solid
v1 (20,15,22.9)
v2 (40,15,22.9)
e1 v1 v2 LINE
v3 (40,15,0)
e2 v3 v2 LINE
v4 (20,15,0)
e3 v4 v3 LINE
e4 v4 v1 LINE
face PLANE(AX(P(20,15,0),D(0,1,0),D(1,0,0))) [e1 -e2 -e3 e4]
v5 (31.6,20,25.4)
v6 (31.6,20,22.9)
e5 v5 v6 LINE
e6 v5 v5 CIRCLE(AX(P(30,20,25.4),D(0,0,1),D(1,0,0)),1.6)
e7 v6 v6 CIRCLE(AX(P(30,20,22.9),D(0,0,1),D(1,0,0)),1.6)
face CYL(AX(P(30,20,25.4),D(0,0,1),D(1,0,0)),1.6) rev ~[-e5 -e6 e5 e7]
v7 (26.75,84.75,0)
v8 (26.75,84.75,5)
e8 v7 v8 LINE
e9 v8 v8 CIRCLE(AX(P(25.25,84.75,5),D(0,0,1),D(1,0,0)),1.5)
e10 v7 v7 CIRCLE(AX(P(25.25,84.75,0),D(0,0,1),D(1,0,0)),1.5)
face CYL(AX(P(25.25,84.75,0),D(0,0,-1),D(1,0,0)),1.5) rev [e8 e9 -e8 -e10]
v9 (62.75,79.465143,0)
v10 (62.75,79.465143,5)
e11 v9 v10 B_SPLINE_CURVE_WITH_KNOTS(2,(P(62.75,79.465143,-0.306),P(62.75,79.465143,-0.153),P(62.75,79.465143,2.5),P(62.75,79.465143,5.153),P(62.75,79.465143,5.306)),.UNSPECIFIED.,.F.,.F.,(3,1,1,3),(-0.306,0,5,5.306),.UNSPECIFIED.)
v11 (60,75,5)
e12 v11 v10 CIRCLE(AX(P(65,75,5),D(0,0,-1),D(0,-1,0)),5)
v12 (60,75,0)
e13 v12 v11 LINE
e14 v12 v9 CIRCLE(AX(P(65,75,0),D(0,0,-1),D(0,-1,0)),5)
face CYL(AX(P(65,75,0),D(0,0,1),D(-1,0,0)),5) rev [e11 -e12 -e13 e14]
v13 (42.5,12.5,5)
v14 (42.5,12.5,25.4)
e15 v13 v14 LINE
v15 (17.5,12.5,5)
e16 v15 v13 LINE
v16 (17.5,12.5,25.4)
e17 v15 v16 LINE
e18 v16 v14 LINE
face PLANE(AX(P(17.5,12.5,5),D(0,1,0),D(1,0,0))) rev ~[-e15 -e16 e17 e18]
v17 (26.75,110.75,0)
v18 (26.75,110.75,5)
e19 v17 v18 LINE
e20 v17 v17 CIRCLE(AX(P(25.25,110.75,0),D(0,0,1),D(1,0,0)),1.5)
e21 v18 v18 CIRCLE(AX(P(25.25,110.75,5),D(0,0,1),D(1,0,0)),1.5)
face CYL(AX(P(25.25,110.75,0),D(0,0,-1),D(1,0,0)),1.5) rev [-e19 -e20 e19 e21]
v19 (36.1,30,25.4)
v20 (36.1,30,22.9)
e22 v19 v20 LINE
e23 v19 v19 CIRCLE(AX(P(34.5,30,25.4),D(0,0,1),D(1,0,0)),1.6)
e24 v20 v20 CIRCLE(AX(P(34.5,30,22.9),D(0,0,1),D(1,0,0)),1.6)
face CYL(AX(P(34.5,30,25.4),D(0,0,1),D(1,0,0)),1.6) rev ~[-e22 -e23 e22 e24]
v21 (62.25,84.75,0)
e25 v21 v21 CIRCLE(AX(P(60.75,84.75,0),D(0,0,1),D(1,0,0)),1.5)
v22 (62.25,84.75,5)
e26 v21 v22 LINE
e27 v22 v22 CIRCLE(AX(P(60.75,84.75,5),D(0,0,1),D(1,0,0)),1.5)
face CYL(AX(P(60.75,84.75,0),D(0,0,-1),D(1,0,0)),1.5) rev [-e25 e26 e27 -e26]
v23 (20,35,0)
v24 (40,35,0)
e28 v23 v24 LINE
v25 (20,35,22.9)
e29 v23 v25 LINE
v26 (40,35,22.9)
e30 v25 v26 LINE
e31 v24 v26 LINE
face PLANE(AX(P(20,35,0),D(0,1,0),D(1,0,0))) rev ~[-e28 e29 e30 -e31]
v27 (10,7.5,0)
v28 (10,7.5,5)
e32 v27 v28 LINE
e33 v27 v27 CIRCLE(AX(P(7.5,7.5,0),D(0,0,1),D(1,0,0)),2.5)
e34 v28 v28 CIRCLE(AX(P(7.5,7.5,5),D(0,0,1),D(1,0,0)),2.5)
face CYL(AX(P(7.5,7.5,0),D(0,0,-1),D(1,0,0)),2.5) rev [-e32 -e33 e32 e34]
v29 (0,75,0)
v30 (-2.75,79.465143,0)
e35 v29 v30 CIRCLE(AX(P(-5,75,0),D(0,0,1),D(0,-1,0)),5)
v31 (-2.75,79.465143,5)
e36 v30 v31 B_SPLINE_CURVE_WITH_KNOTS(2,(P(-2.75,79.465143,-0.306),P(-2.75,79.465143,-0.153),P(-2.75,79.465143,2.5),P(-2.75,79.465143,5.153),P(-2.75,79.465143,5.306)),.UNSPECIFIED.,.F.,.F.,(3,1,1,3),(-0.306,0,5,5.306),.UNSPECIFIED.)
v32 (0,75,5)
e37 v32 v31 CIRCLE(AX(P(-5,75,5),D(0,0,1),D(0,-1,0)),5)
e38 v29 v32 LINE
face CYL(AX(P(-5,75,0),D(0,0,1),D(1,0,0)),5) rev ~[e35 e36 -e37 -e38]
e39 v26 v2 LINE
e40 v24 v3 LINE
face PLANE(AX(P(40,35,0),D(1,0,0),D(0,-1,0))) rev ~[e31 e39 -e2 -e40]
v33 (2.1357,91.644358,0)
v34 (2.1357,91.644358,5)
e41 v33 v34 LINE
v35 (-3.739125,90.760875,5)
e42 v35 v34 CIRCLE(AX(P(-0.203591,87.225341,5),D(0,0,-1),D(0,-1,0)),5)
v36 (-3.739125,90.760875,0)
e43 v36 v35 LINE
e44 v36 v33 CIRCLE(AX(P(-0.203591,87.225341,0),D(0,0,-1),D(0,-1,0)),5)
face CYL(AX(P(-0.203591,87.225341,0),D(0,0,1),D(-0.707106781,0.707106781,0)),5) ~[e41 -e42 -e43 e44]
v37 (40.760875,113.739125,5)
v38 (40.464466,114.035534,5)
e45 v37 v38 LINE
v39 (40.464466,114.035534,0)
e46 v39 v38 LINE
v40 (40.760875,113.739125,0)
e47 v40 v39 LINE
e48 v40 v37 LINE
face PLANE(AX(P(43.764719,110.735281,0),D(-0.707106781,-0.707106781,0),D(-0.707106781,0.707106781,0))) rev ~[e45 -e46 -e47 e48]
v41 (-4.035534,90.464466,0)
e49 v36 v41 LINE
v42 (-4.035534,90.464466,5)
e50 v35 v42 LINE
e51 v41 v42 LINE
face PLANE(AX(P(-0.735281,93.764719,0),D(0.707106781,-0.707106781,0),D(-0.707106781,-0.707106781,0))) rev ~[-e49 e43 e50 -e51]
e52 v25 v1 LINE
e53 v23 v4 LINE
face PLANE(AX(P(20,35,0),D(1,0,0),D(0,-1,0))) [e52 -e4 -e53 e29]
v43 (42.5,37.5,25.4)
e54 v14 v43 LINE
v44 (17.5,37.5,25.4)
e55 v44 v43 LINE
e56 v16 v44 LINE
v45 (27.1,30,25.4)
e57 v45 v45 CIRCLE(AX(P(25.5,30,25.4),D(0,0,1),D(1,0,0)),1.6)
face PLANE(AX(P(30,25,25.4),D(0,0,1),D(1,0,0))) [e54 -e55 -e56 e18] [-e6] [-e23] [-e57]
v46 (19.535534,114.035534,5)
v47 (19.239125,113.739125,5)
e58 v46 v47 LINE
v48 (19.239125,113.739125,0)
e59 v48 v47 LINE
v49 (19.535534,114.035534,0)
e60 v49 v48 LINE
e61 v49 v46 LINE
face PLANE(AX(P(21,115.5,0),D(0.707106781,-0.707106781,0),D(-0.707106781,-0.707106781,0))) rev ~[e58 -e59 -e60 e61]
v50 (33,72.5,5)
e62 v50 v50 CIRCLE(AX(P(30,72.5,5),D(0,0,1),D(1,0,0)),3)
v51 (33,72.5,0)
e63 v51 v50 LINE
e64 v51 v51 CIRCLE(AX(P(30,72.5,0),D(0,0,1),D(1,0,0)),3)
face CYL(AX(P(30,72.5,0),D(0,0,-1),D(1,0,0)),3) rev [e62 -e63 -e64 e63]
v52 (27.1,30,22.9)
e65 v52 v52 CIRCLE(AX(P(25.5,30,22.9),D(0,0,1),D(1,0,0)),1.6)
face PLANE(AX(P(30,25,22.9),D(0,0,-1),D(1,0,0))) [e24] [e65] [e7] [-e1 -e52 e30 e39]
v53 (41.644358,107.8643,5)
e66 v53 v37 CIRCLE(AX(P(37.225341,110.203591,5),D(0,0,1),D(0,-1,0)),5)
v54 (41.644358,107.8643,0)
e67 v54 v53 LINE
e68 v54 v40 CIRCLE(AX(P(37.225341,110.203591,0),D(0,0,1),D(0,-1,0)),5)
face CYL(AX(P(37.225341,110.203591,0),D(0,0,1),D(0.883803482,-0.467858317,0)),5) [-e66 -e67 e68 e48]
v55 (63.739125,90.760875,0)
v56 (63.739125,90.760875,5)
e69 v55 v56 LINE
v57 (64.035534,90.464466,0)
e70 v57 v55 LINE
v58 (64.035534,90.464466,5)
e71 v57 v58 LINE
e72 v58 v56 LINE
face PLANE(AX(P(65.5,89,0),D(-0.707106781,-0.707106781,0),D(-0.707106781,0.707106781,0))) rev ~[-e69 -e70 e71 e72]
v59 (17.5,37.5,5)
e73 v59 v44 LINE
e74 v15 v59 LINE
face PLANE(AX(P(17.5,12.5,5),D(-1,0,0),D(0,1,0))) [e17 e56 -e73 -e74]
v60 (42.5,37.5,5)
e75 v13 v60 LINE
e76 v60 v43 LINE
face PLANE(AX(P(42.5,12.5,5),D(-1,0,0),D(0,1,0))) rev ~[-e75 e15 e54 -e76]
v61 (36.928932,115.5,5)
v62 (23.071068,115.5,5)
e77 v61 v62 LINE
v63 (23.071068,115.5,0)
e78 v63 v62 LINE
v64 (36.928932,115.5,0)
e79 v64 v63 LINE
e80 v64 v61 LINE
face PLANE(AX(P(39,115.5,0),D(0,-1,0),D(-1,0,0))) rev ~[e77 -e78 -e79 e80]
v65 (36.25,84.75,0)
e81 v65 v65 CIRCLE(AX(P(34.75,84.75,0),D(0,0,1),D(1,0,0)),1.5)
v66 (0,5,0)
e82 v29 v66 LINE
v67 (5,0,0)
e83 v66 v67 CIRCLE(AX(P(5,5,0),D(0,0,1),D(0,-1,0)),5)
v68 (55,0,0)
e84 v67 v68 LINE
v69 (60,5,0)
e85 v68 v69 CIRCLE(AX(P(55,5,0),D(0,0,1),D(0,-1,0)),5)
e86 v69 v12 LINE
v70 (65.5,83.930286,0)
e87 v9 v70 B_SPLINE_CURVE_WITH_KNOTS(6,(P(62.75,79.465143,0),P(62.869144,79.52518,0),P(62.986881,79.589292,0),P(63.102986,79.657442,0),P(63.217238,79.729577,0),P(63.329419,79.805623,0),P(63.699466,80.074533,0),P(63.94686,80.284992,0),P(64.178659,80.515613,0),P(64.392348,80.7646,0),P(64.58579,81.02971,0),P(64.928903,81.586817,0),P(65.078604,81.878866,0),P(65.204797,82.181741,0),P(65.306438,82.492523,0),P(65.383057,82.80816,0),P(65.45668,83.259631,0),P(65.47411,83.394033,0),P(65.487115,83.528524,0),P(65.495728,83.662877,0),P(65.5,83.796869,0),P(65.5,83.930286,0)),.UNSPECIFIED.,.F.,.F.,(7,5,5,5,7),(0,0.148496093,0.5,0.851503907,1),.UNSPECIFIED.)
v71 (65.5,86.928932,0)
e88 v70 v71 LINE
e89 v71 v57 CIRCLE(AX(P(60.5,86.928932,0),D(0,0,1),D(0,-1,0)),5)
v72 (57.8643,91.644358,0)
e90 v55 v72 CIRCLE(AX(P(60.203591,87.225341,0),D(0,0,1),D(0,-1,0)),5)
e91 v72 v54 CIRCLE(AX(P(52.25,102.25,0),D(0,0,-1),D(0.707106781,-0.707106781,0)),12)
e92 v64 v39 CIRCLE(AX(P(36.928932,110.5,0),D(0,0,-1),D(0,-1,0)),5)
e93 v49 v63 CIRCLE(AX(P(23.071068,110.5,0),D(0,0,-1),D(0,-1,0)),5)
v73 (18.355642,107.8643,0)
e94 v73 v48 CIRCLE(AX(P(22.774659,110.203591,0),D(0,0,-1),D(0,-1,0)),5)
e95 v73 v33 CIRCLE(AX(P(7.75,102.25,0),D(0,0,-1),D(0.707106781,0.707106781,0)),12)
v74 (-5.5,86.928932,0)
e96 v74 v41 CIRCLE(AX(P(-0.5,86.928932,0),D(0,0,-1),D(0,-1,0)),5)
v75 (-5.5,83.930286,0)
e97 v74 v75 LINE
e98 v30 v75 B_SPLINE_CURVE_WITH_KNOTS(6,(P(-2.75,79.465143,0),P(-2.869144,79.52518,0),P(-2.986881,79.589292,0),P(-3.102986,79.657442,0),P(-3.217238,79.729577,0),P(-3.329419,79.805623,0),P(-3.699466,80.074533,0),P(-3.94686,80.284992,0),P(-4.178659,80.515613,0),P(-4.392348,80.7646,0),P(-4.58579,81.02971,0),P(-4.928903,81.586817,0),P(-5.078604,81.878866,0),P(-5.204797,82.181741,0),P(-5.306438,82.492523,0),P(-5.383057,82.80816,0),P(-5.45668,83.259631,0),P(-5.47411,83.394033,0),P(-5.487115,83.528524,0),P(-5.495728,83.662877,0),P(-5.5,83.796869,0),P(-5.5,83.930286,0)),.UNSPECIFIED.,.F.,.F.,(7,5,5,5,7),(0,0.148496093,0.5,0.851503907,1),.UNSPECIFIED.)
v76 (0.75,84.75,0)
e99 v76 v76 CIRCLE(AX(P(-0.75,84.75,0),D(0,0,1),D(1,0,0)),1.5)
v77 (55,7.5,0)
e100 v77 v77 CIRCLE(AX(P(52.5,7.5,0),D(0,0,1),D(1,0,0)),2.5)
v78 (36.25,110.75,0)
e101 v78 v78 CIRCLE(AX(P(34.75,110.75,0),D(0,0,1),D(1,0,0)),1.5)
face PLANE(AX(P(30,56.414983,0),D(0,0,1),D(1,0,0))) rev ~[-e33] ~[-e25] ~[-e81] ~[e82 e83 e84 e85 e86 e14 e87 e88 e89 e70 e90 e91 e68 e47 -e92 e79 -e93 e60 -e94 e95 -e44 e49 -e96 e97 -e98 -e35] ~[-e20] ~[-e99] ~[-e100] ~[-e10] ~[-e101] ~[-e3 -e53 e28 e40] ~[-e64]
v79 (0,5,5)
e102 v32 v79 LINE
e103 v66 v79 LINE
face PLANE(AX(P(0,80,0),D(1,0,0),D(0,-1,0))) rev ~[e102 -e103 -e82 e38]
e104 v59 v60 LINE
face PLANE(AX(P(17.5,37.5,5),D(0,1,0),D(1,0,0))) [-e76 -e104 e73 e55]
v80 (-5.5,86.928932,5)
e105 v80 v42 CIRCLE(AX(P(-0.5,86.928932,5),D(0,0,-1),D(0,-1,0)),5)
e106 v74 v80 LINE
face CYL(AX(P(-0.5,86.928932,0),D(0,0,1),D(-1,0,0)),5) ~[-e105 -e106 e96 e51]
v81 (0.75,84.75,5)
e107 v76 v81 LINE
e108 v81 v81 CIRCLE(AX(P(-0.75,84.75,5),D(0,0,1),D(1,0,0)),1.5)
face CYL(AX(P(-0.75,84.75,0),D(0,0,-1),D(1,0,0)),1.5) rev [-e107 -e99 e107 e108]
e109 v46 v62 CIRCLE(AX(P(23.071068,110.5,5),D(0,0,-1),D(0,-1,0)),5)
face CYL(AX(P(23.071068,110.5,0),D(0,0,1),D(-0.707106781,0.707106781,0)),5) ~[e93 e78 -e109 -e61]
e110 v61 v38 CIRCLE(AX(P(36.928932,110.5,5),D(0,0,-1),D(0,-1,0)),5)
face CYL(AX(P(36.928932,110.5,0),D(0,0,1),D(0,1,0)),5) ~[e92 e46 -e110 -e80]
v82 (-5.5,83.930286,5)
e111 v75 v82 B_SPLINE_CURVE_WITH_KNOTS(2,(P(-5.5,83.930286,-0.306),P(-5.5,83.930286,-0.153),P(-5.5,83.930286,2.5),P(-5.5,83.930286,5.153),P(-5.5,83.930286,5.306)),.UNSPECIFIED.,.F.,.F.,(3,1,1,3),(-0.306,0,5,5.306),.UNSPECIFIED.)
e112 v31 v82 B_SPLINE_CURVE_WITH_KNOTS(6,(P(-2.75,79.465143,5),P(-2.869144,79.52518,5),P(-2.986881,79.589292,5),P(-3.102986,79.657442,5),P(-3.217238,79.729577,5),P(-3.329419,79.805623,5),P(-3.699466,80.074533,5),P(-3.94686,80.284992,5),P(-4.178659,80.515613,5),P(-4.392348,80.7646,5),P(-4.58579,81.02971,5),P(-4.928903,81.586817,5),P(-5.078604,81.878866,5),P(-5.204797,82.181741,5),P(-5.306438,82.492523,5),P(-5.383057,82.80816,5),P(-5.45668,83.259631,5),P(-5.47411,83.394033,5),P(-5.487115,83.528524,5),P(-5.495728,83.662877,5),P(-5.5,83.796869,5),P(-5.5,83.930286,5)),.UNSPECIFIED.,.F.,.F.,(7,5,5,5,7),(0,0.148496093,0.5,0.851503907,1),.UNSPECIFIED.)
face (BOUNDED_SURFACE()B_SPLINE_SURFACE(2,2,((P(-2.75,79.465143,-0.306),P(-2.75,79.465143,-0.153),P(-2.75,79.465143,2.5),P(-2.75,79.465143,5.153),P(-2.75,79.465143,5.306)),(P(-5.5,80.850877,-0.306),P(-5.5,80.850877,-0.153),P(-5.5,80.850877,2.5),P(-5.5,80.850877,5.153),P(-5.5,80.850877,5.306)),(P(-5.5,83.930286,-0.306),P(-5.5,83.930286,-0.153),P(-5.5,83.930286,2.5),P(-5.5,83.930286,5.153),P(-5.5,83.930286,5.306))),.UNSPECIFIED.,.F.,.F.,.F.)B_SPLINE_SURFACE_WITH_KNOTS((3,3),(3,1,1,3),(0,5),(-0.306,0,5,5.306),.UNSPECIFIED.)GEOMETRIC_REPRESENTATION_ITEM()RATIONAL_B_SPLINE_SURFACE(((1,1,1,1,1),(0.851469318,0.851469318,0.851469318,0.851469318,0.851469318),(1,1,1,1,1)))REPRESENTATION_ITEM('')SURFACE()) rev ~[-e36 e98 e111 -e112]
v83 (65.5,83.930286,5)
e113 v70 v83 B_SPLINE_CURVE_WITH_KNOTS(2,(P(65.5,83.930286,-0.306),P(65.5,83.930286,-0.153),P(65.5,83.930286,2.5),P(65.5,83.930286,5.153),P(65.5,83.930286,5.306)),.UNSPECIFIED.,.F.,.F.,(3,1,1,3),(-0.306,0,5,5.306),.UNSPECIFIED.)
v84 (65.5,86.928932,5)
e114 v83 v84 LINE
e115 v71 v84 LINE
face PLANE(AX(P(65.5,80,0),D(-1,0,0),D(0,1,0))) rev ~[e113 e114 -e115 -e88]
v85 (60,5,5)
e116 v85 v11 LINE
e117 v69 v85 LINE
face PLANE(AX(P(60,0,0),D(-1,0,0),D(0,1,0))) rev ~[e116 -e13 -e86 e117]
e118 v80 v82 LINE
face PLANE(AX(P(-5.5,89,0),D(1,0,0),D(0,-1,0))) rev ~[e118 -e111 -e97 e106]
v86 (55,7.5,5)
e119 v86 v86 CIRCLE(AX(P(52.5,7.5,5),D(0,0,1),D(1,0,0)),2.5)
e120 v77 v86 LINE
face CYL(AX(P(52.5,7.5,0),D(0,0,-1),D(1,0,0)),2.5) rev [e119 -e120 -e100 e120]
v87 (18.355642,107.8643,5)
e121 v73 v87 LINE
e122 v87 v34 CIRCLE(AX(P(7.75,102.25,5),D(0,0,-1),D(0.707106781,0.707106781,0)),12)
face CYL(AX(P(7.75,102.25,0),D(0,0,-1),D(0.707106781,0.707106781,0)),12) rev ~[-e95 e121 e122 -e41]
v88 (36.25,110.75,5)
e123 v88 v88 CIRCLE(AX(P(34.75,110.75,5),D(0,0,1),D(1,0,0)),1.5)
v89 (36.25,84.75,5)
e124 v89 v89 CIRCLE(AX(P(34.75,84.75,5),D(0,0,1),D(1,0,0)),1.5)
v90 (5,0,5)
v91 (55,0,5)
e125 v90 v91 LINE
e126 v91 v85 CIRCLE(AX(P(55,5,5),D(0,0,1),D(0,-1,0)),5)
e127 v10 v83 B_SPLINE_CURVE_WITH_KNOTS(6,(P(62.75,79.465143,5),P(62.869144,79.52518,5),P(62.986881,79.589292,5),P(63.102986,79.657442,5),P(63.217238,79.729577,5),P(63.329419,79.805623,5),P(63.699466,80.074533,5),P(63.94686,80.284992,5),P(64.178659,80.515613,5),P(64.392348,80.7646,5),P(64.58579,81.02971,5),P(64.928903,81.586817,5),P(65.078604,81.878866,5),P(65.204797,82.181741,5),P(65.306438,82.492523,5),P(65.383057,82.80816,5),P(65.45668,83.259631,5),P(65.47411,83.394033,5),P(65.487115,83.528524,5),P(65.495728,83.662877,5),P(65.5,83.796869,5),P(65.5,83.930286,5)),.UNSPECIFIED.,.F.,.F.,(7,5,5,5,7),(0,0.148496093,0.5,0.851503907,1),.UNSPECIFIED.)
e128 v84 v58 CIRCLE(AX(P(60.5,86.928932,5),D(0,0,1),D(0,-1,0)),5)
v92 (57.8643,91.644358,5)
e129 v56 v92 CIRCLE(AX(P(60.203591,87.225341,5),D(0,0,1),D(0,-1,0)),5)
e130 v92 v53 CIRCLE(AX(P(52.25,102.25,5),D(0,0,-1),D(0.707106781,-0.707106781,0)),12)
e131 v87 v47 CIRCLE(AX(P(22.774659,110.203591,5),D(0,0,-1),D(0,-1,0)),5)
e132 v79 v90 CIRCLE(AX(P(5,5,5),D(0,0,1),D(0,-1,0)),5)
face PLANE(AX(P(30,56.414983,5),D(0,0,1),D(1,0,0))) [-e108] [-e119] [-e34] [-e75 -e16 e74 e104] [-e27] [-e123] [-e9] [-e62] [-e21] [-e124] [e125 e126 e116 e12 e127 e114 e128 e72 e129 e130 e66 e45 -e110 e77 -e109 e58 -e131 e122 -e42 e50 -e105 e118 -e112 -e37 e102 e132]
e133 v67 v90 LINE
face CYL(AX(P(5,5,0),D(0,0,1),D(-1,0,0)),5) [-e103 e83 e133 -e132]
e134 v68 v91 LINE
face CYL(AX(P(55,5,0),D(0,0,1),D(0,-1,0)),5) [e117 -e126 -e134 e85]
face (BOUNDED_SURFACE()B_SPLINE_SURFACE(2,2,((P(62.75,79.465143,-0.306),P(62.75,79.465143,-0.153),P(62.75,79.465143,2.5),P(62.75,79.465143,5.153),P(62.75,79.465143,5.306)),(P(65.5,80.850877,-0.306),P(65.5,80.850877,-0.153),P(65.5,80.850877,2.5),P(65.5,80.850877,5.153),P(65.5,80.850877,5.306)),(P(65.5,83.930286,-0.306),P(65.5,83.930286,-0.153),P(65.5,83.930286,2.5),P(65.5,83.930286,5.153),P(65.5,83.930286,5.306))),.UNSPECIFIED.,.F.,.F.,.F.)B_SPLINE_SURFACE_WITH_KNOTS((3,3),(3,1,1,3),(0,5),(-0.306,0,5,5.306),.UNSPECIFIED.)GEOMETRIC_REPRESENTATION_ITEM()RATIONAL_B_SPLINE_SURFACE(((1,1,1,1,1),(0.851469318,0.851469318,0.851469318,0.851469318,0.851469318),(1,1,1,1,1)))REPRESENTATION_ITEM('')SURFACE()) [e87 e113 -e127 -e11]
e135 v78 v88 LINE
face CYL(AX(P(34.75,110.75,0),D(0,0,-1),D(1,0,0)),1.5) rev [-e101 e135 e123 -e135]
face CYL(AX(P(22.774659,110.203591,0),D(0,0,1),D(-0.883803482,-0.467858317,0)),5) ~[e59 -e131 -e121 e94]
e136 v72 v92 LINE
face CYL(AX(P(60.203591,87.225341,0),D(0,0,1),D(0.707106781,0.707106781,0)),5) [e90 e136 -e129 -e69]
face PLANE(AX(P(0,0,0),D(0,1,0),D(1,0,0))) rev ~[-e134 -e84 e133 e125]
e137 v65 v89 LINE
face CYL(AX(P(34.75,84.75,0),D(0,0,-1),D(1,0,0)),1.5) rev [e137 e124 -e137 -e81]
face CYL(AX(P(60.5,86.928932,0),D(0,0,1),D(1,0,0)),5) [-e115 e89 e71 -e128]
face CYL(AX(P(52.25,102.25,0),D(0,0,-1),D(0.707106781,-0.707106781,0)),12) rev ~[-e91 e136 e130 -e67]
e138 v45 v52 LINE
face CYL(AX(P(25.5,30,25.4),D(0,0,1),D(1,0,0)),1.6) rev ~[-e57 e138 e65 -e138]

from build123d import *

# Parameters (mm, degrees)
F0_R     = 2.5
F0_R_2   = 1.5
F0_R_3   = 3
F1_DEPTH = 5
F2_R     = 5
F3_R     = 5
F4_W     = 25
F4_H     = 25
F5_DEPTH = 20.4
F6_W     = 20
F6_H     = 20
F7_DEPTH = 22.9
F8_R     = 1.6
F9_DEPTH = 25.4010001


with BuildPart() as f1:
    # F0 (on Top) → F1 (new body)
    with BuildSketch(Plane.XY):
        with BuildLine():
            Line((0, 80), (0, 0))
            Line((0, 0), (60, 0))
            Line((60, 0), (60, 80))
            Line((60, 80), (65.5, 80))
            Line((65.5, 80), (65.5, 89))
            Line((65.5, 89), (60.7352813742, 93.7647186258))
            ThreePointArc((60.7352813742, 93.7647186258), (43.7647186258, 93.7647186258), (43.7647186258, 110.7352813742))
            Line((43.7647186258, 110.7352813742), (39, 115.5))
            Line((39, 115.5), (21, 115.5))
            Line((21, 115.5), (16.2352813742, 110.7352813742))
            ThreePointArc((16.2352813742, 110.7352813742), (16.2352813742, 93.7647186258), (-0.7352813742, 93.7647186258))
            Line((-0.7352813742, 93.7647186258), (-5.5, 89))
            Line((-5.5, 89), (-5.5, 80))
            Line((-5.5, 80), (0, 80))
        make_face()
        with Locations((7.5, 7.5)):
            Circle(F0_R, mode=Mode.SUBTRACT)
        with Locations((52.5, 7.5)):
            Circle(F0_R, mode=Mode.SUBTRACT)
        with Locations((-0.75, 84.75)):
            Circle(F0_R_2, mode=Mode.SUBTRACT)
        with Locations((25.25, 84.75)):
            Circle(F0_R_2, mode=Mode.SUBTRACT)
        with Locations((25.25, 110.75)):
            Circle(F0_R_2, mode=Mode.SUBTRACT)
        with Locations((30, 72.5)):
            Circle(F0_R_3, mode=Mode.SUBTRACT)
        with Locations((34.75, 84.75)):
            Circle(F0_R_2, mode=Mode.SUBTRACT)
        with Locations((60.75, 84.75)):
            Circle(F0_R_2, mode=Mode.SUBTRACT)
        with Locations((34.75, 110.75)):
            Circle(F0_R_2, mode=Mode.SUBTRACT)
    extrude(amount=F1_DEPTH)

    # F2
    f2_edges = [f1.edges().sort_by_distance(p)[0] for p in [
        (0, 0, 2.5),
        (60, 0, 2.5),
        (-0.735281, 93.764719, 2.5),
        (-5.5, 89, 2.5),
        (0, 80, 2.5),
        (60, 80, 2.5),
        (65.5, 89, 2.5),
        (60.735281, 93.764719, 2.5),
        (43.764719, 110.735281, 2.5),
        (39, 115.5, 2.5),
        (21, 115.5, 2.5),
        (16.235281, 110.735281, 2.5),
    ]]
    fillet(f2_edges, radius=F2_R)

    # F3
    f3_edges = [f1.edges().sort_by_distance(p)[0] for p in [
        (-5.5, 80, 2.5),
        (65.5, 80, 2.5),
    ]]
    fillet(f3_edges, radius=F3_R)

    # F4 (on face) → F5 (join)
    with BuildSketch(Plane.XY.offset(5)):
        with Locations((30, 25)):
            Rectangle(F4_W, F4_H)
    extrude(amount=F5_DEPTH)

    # F6 (on face) → F7 (cut)
    with BuildSketch(Plane(origin=(0, 0, 0), x_dir=(1, 0, 0), z_dir=(0, 0, -1))):
        with Locations((30, -25)):
            Rectangle(F6_W, F6_H)
    extrude(amount=-F7_DEPTH, mode=Mode.SUBTRACT)

    # F8 (on face) → F9 (cut, through all)
    with BuildSketch(Plane.XY.offset(25.4)):
        with Locations((25.5, 30)):
            Circle(F8_R)
        with Locations((30, 20)):
            Circle(F8_R)
        with Locations((34.5, 30)):
            Circle(F8_R)
    extrude(amount=-F9_DEPTH, mode=Mode.SUBTRACT)


solid = f1.part
